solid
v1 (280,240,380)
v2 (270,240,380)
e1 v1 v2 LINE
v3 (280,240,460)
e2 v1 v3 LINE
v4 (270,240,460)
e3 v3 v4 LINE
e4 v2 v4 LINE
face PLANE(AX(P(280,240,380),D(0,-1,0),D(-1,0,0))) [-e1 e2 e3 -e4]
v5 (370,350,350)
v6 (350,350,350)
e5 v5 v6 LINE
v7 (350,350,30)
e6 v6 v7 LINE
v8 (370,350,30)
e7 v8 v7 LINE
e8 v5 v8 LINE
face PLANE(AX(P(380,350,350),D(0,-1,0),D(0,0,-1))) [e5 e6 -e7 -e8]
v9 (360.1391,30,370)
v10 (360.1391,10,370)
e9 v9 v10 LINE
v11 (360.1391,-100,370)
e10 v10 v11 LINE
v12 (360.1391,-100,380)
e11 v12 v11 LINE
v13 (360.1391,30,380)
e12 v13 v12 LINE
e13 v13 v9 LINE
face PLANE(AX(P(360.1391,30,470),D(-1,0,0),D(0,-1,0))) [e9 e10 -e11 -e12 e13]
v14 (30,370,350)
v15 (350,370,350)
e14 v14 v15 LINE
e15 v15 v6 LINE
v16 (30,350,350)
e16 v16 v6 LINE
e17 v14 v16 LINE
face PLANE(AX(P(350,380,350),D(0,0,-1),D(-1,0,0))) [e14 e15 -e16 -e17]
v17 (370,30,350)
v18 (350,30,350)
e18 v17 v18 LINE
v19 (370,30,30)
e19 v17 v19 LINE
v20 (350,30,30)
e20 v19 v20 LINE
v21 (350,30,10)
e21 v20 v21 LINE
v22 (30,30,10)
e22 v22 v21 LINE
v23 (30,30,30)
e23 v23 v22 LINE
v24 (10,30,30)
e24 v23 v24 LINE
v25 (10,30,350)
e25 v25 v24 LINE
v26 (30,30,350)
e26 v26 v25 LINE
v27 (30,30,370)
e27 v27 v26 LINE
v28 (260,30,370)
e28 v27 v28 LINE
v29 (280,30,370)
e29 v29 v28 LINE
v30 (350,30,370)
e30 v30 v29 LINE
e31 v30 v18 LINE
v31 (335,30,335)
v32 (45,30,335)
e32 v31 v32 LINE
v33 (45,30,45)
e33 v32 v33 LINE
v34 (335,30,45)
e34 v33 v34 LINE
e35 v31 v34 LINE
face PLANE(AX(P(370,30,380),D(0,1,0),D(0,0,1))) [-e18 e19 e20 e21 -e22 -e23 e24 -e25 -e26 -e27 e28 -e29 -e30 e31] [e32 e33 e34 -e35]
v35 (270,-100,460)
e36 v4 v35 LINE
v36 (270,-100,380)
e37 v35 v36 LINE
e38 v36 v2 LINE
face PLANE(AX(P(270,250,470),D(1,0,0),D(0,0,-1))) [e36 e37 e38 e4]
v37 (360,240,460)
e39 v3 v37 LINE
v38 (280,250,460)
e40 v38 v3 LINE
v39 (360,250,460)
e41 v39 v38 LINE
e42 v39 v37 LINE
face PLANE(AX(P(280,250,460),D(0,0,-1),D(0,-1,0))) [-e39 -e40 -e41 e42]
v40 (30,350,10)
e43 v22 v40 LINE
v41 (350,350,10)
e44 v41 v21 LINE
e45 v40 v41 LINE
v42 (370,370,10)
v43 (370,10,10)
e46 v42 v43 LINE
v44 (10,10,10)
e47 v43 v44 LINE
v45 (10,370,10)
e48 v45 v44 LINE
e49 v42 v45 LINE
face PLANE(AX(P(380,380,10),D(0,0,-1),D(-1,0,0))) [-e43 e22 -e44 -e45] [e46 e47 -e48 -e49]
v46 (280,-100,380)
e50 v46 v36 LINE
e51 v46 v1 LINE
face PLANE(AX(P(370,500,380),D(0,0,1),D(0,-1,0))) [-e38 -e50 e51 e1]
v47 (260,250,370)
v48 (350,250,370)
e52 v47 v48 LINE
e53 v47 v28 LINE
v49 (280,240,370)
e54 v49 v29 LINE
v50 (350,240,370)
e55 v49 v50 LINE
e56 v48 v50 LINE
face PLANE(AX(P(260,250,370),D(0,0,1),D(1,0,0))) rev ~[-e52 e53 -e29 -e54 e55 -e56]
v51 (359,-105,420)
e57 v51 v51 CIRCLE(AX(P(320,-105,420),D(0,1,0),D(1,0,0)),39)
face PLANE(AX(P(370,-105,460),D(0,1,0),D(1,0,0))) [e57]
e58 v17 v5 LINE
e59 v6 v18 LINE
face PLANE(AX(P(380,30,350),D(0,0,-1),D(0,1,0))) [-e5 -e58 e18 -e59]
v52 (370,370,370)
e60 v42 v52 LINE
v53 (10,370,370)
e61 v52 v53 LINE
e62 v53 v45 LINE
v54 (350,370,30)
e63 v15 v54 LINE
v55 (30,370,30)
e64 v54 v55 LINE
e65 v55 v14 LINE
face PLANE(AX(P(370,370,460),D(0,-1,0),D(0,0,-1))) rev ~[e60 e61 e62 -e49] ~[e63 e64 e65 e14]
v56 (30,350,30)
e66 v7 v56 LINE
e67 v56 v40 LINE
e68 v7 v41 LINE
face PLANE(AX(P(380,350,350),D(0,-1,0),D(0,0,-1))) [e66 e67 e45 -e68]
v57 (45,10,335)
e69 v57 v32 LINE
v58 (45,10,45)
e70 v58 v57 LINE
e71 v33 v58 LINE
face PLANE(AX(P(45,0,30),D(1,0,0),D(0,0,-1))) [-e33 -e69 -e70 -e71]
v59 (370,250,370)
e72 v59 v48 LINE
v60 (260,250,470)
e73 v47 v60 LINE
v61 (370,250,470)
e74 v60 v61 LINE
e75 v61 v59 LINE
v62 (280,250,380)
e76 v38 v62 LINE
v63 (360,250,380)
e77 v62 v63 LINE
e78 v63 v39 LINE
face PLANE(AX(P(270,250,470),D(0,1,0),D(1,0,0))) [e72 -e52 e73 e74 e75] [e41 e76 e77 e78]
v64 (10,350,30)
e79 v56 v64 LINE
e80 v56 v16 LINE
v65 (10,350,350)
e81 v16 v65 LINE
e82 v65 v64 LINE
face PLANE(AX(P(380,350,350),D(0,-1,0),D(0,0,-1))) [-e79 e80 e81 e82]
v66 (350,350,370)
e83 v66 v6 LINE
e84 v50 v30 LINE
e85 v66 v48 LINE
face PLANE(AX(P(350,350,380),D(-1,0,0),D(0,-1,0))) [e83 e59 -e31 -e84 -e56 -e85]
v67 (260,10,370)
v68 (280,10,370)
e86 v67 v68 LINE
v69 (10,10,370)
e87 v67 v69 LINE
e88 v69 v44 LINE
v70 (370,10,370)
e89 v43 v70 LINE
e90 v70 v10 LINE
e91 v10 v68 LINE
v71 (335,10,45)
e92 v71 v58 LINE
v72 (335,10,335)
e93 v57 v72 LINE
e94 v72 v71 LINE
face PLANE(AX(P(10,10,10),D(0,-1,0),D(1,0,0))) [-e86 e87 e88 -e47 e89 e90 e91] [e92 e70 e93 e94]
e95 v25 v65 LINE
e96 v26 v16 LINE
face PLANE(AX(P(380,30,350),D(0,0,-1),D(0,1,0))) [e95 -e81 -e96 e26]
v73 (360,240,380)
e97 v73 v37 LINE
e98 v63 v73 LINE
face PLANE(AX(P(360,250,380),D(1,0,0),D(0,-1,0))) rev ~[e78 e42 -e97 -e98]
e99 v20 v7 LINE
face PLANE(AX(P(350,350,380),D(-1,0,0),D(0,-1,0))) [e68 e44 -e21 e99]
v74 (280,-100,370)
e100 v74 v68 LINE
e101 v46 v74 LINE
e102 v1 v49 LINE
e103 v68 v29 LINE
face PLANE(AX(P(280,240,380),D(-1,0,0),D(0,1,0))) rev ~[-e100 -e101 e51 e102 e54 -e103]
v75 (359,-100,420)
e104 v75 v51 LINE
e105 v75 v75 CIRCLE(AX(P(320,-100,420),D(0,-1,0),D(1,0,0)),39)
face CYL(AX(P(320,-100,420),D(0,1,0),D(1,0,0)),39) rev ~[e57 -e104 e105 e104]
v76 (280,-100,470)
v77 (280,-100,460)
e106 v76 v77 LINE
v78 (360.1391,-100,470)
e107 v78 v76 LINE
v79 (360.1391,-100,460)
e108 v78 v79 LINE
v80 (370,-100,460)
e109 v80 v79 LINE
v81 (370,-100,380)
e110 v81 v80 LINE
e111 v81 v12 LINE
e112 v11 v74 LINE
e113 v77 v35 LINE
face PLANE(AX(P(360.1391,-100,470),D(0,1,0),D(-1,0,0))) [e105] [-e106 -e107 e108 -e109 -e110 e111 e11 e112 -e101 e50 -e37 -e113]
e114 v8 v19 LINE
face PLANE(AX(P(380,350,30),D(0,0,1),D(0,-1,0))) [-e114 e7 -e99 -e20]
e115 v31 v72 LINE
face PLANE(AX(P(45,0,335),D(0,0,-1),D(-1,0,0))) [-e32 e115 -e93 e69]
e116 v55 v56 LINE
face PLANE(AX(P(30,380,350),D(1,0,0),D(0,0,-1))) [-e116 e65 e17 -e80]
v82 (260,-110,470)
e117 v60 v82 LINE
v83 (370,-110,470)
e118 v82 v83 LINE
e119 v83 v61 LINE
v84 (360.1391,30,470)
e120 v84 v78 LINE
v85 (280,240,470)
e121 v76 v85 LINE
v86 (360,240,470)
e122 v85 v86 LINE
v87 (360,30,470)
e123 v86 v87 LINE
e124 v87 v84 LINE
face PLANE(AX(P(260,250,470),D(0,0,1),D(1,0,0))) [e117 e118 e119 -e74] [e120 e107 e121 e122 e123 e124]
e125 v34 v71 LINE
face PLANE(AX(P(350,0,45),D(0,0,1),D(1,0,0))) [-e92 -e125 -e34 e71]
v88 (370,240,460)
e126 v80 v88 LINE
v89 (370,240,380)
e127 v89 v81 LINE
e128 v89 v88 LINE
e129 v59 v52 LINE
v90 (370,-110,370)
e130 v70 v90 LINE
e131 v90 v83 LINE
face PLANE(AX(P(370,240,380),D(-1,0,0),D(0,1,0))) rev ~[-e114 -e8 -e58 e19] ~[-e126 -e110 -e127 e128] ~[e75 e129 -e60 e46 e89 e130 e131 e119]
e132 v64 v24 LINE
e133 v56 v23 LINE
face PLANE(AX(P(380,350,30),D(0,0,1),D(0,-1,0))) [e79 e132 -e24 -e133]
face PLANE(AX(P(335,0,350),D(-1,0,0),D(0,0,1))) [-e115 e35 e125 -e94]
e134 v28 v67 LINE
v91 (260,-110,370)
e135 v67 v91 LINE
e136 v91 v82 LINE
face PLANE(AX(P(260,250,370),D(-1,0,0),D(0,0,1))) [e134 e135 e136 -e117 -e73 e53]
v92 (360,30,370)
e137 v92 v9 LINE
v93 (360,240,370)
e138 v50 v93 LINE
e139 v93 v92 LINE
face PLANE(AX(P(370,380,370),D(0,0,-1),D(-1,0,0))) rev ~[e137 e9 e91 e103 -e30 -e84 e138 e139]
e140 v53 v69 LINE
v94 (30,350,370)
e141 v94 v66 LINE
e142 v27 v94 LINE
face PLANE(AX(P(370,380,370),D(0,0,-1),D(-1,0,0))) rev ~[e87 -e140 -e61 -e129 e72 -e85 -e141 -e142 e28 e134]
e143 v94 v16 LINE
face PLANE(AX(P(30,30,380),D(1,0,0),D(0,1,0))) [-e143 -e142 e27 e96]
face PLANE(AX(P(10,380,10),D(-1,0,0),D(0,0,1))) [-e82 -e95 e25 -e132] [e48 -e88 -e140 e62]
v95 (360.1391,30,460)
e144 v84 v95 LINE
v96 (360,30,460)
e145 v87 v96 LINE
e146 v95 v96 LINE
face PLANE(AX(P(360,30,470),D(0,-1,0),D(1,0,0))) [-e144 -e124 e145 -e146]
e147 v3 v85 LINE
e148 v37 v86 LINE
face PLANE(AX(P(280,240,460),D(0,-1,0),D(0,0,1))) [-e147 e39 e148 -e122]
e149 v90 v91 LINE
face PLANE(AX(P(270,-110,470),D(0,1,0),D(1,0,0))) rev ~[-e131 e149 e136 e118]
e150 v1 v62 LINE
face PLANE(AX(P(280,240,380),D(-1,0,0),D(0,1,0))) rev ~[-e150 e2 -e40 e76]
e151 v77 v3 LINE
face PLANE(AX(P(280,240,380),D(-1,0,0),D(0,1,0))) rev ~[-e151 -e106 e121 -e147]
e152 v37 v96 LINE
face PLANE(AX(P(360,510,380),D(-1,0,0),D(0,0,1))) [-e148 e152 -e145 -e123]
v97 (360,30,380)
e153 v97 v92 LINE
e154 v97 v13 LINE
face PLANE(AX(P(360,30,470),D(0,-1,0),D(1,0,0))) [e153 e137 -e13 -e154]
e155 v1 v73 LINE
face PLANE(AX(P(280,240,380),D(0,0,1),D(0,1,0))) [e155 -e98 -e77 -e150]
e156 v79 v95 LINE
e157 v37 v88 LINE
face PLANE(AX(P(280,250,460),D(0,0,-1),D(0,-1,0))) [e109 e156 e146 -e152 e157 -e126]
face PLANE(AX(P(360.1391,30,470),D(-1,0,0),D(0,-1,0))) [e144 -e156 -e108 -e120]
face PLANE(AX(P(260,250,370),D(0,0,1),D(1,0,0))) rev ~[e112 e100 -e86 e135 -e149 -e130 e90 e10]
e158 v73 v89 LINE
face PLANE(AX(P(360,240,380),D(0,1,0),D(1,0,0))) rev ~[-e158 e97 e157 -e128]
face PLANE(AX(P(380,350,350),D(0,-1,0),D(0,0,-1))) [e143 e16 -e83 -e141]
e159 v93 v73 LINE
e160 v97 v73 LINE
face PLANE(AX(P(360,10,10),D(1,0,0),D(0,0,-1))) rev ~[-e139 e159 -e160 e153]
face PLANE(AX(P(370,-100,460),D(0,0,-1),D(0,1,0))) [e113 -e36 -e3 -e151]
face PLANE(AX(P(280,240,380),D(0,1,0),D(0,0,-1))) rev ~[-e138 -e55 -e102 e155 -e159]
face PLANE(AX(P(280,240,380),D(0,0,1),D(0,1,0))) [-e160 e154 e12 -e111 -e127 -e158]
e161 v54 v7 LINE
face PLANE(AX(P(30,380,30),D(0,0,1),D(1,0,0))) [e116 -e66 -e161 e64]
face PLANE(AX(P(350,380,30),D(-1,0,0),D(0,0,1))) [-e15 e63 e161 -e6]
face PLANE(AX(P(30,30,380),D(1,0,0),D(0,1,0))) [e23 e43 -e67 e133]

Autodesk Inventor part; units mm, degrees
ref_plane "YZ Plane" through (0, 0, 0) normal (1, 0, 0) x (0, 1, 0)
ref_plane "XZ Plane" through (0, 0, 0) normal (0, 1, 0) x (-1, 0, 0)
ref_plane "XY Plane" through (0, 0, 0) normal (0, 0, 1) x (1, 0, 0)
sketch "Sketch1" plane through (0, 0, 0) normal (0, 0, 1) x (1, 0, 0)
  line L0 (0, 0) -> (380, 0)
  line L1 (380, 0) -> (380, 380)
  line L2 (380, 380) -> (0, 380)
  line L3 (0, 380) -> (0, 0)
  dimension "d0" = 380
  dimension "d1" = 380
extrude "Extrusion1" add sketch "Sketch1" along normal blind 380
sketch "Sketch2" plane through (0, 0, 380) normal (0, 0, 1) x (1, 0, 0)
  line L0 (30, 350) -> (350, 350)
  line L1 (350, 350) -> (350, 30)
  line L2 (350, 30) -> (30, 30)
  line L3 (30, 30) -> (30, 350)
  line L4 (380, 380) -> (0, 380) projected
  line L5 (0, 380) -> (0, 0) projected
  line L6 (0, 0) -> (380, 0) projected
  line L7 (380, 0) -> (380, 380) projected
  dimension "d4" = 30
  dimension "d5" = 30
  dimension "d6" = 30
  dimension "d7" = 30
extrude "Extrusion2" cut sketch "Sketch2" against normal blind 600 contours L0 L1 L2 L3
sketch "Sketch3" plane through (380, 0, 0) normal (1, 0, 0) x (0, 0, -1)
  line L0 (-350, 350) -> (-30, 350)
  line L1 (-30, 350) -> (-30, 30)
  line L2 (-30, 30) -> (-350, 30)
  line L3 (-350, 30) -> (-350, 350)
  line L4 (0, 380) -> (-380, 380) projected
  line L5 (-380, 0) -> (-380, 380) projected
  line L6 (0, 0) -> (0, 380) projected
  line L7 (0, 0) -> (-380, 0) projected
  dimension "d10" = 30
  dimension "d11" = 30
  dimension "d12" = 30
  dimension "d13" = 30
extrude "Extrusion3" cut sketch "Sketch3" against normal blind 600 contours L0 L1 L2 L3
sketch "Sketch4" plane through (0, 380, 0) normal (0, 1, 0) x (1, 0, 0)
  line L0 (30, -30) -> (30, 0) projected
  line L1 (350, -380) -> (350, -350) projected
  line L2 (30, -30) -> (350, -30)
  line L3 (350, -30) -> (350, -350)
  line L4 (350, -350) -> (30, -350)
  line L5 (30, -350) -> (30, -30)
  point P0 (0, 0)
extrude "Extrusion4" cut sketch "Sketch4" against normal blind 600
sketch "Sketch5" plane through (30, 0, 30) normal (1, 0, 0) x (0, 0, -1)
  line L0 (-350, 30) -> (-320, 30) projected
  line L1 (0, 30) -> (0, 0) projected
  line L2 (-320, 30) -> (0, 30)
  line L3 (0, 30) -> (0, 0)
  line L4 (0, 0) -> (-320, 0)
  line L5 (-320, 0) -> (-320, 30)
  point P0 (30, 0)
extrude "Extrusion5" add sketch "Sketch5" along normal blind 15
sketch "Sketch6" plane through (350, 0, 30) normal (0, 0, 1) x (1, 0, 0)
  line L0 (-320, 30) -> (-350, 30) projected
  line L1 (0, 30) -> (0, 0) projected
  line L2 (-320, 30) -> (0, 30)
  line L3 (0, 30) -> (0, 0)
  line L4 (0, 0) -> (-320, 0)
  line L5 (-320, 0) -> (-320, 30)
  point P0 (-350, 0)
extrude "Extrusion6" add sketch "Sketch6" along normal blind 15
sketch "Sketch7" plane through (350, 0, 350) normal (-1, 0, 0) x (0, 0, 1)
  line L0 (0, 30) -> (-320, 30) projected
  line L1 (0, 0) -> (-305, 0) projected
  line L2 (-320, 30) -> (0, 30)
  line L3 (0, 30) -> (0, 0)
  line L4 (0, 0) -> (-320, 0)
  line L5 (-320, 0) -> (-320, 30)
  point P0 (-350, 0)
extrude "Extrusion7" add sketch "Sketch7" along normal blind 15
sketch "Sketch8" plane through (45, 0, 350) normal (0, 0, -1) x (-1, 0, 0)
  line L0 (45, 0) -> (-335, 0) projected
  line L1 (-305, 30) -> (15, 30)
  line L2 (15, 30) -> (15, 0)
  line L3 (15, 0) -> (-305, 0)
  line L4 (-305, 0) -> (-305, 30)
  dimension "d24" = 320
extrude "Extrusion8" add sketch "Sketch8" along normal blind 15
sketch "Sketch9" plane through (0, 380, 0) normal (0, 1, 0) x (1, 0, 0)
  line L0 (0, -380) -> (380, -380) projected
  line L1 (0, 0) -> (20, 0)
  line L2 (10, -380) -> (0, -380)
  line L3 (0, -380) -> (0, 0)
  line L4 (20, 0) -> (380, 0)
  line L5 (380, 0) -> (380, -10)
  line L6 (380, -10) -> (10, -10)
  line L7 (10, -10) -> (10, -380)
  line L8 (0, -30) -> (0, -350) projected
  dimension "d27" = 10
  dimension "d28" = 10
extrude "Extrusion9" cut sketch "Sketch9" against normal blind 900
sketch "Sketch10" plane through (10, 380, 10) normal (0, 1, 0) x (1, 0, 0)
  line L0 (370, 0) -> (360, 0)
  line L1 (360, 0) -> (360, -370)
  line L2 (360, -370) -> (370, -370)
  line L3 (370, -370) -> (370, 0)
  line L4 (0, -370) -> (360, -370)
  line L5 (360, -370) -> (360, -360)
  line L6 (360, -360) -> (0, -360)
  line L7 (0, -360) -> (0, -370)
  point P0 (-10, 10)
  dimension "d31" = 10
  dimension "d32" = 10
extrude "Extrusion10" cut sketch "Sketch10" against normal blind 900
sketch "Sketch11" plane through (370, 380, 370) normal (1, 0, 0) x (0, 0, -1)
  line L0 (0, 0) -> (360, 0) projected
  line L1 (0, 0) -> (360, 0)
  line L2 (360, 0) -> (360, -10)
  line L3 (360, -10) -> (0, -10)
  line L4 (0, -10) -> (0, 0)
  line L5 (360, 0) -> (360, -380) projected
  line L6 (0, -380) -> (360, -380)
  line L7 (360, -380) -> (360, -370)
  line L8 (360, -370) -> (0, -370)
  line L9 (0, -370) -> (0, -380)
  point P0 (370, -380)
  dimension "d35" = 10
  dimension "d36" = 10
extrude "Extrusion11" cut sketch "Sketch11" against normal blind 900
sketch "Sketch13" plane through (10, 10, 370) normal (0, 0, 1) x (1, 0, 0)
  line L0 (0, 0) -> (360, 0) projected
  line L1 (360, 0) -> (260, 0)
  line L2 (260, 0) -> (260, 500)
  line L3 (260, 500) -> (360, 500)
  line L4 (360, 500) -> (360, 0)
  point P0 (-10, -10)
  point P1 (260, 0)
  dimension "d41" = 100
  dimension "d42" = 500
extrude "Extrusion13" add sketch "Sketch13" along normal blind 100
sketch "Sketch14" plane through (270, 510, 370) normal (0, 1, 0) x (1, 0, 0)
  line L0 (10, -10) -> (90, -10)
  line L1 (90, -10) -> (90, -90)
  line L2 (90, -90) -> (10, -90)
  line L3 (10, -90) -> (10, -10)
  line L4 (100, 0) -> (0, 0) projected
  line L5 (0, 0) -> (0, -100) projected
  line L6 (100, -100) -> (0, -100) projected
  line L7 (100, 0) -> (100, -100) projected
  point P0 (-270, 370)
  dimension "d45" = 10
  dimension "d46" = 10
  dimension "d47" = 10
  dimension "d48" = 10
extrude "Extrusion14" cut sketch "Sketch14" against normal blind 900 contours L0 L1 L2 L3
sketch "Sketch15" plane through (10, 10, 470) normal (0, 0, 1) x (1, 0, 0)
  line L0 (270, 500) -> (270, 0) projected
  line L1 (360, 20) -> (340, 20) projected
  line L2 (270, 490) -> (350, 490)
  line L3 (350, 490) -> (350, 20)
  line L4 (350, 20) -> (270, 20)
  line L5 (270, 20) -> (270, 490)
  line L6 (360, 500) -> (260, 500) projected
  point P0 (-10, -10)
  point P1 (270, 20)
  dimension "d51" = 10
extrude "Extrusion15" cut sketch "Sketch15" against normal blind 100
sketch "Sketch16" plane through (370, 10, 10) normal (1, 0, 0) x (0, 0, -1)
  line L0 (-450, 490) -> (-370, 490)
  line L1 (-370, 490) -> (-370, 20)
  line L2 (-370, 20) -> (-450, 20)
  line L3 (-450, 20) -> (-450, 490)
  line L4 (-360, 500) -> (-460, 500) projected
  line L5 (-460, 0) -> (-460, 500) projected
  line L6 (-360, 360) -> (-360, 500) projected
  line L7 (0, 0) -> (-460, 0) projected
  point P0 (10, -10)
  dimension "d54" = 10
  dimension "d55" = 10
  dimension "d56" = 10
  dimension "d57" = 20
extrude "Extrusion16" cut sketch "Sketch16" against normal blind 100
sketch "Sketch17" plane through (10, 10, 10) normal (0, -1, 0) x (1, 0, 0)
  line L0 (270, 450) -> (350, 450) projected
  line L1 (270, 370) -> (350, 370) projected
  line L2 (270, 450) -> (350, 450)
  line L3 (350, 450) -> (350, 370)
  line L4 (350, 370) -> (270, 370)
  line L5 (270, 370) -> (270, 450)
  point P0 (-10, -10)
  point P1 (350, 450)
extrude "Extrusion17" add sketch "Sketch17" against normal blind 20
sketch "Sketch19" plane through (370, 10, 10) normal (1, 0, 0) x (0, 0, -1)
  line L0 (-360, 500) -> (-460, 500) projected
  line L1 (-360, 490) -> (-360, 360) projected
  line L2 (-460, 500) -> (-360, 500)
  line L3 (-360, 500) -> (-360, 420)
  line L4 (-360, 420) -> (-460, 420)
  line L5 (-460, 420) -> (-460, 500)
  point P0 (10, -10)
  dimension "d65" = 80
extrude "Extrusion19" cut sketch "Sketch19" against normal blind 8900
sketch "Sketch20" plane through (370, 10, 10) normal (1, 0, 0) x (0, 0, -1)
  line L0 (-460, 420) -> (-450, 420) projected
  line L1 (-360, 360) -> (-360, 20) projected
  line L2 (-460, 420) -> (-360, 420)
  line L3 (-360, 420) -> (-360, 360)
  line L4 (-360, 360) -> (-460, 360)
  line L5 (-460, 360) -> (-460, 420)
  point P0 (10, -10)
extrude "Extrusion20" cut sketch "Sketch20" against normal blind 8900
sketch "Sketch21" plane through (270, 370, 380) normal (0, 0, 1) x (1, 0, 0)
  line L0 (10, -20) -> (10, 0) projected
  line L1 (0, 0) -> (10, 0)
  line L2 (10, 0) -> (10, -20)
  line L3 (10, -20) -> (0, -20)
  line L4 (0, -20) -> (0, 0)
  point P0 (-270, -370)
extrude "Extrusion21" add sketch "Sketch21" along normal up to surface (80 mm away)
sketch "Sketch22" plane through (280, 30, 470) normal (1, 0, 0) x (0, 0, -1)
  line L0 (0, 340) -> (10, 340)
  line L1 (10, 340) -> (10, 320)
  line L2 (10, 320) -> (0, 320)
  line L3 (0, 320) -> (0, 340)
  point P0 (470, -30)
  dimension "d72" = 20
extrude "Extrusion22" add sketch "Sketch22" along normal up to surface (80 mm away)
sketch "Sketch23" plane through (370, 10, 10) normal (1, 0, 0) x (0, 0, -1)
  line L0 (-370, 20) -> (-370, 360) projected
  line L1 (-450, 360) -> (-370, 360)
  line L2 (-370, 360) -> (-370, 340)
  line L3 (-370, 340) -> (-450, 340)
  line L4 (-450, 340) -> (-450, 360)
  point P0 (10, -10)
  dimension "d75" = 20
extrude "Extrusion23" add sketch "Sketch23" against normal blind 10
sketch "Sketch26" plane through (10, 10, 10) normal (0, -1, 0) x (1, 0, 0)
  line L0 (260, 460) -> (360, 460) projected
  line L1 (360, 0) -> (360, 460) projected
  line L2 (260, 460) -> (360, 460)
  line L3 (360, 460) -> (360, 360)
  line L4 (360, 360) -> (260, 360)
  line L5 (260, 360) -> (260, 460)
  point P0 (-10, -10)
  dimension "d86" = 100
extrude "Extrusion26" add sketch "Sketch26" along normal blind 120
sketch "Sketch30" plane through (10, 10, 470) normal (0, 0, 1) x (1, 0, 0)
  line L0 (360, 360) -> (260, 360) projected
  line L1 (260, 340) -> (260, 20) projected
  line L2 (360, 360) -> (260, 360)
  line L3 (260, 360) -> (260, 240)
  line L4 (260, 240) -> (360, 240)
  line L5 (360, 240) -> (360, 360)
  point P0 (-10, -10)
  dimension "d96" = 120
extrude "Extrusion30" cut sketch "Sketch30" against normal up to surface (100 mm away)
sketch "Sketch31" plane through (370, 10, 10) normal (1, 0, 0) x (0, 0, -1)
  line L0 (-450, 240) -> (-450, 20) projected
  line L1 (-450, 20) -> (-370, 20)
  line L2 (-370, 20) -> (-370, -110)
  line L3 (-370, -110) -> (-450, -110)
  line L4 (-450, -110) -> (-450, 20)
  line L5 (-360, -120) -> (-460, -120) projected
  point P0 (10, -10)
  dimension "d99" = 10
extrude "Extrusion31" cut sketch "Sketch31" against normal blind 200
sketch "Sketch32" plane through (10, 10, 470) normal (0, 0, 1) x (1, 0, 0)
  line L0 (350, 20) -> (270, 20) projected
  line L1 (270, 20) -> (350.1391, 20)
  line L2 (350.1391, 20) -> (350.1391, -110)
  line L3 (350.1391, -110) -> (270, -110)
  line L4 (270, -110) -> (270, 20)
  line L5 (360, -120) -> (260, -120) projected
  point P0 (-10, -10)
  point P1 (350, 20)
  dimension "d102" = 10
extrude "Extrusion32" cut sketch "Sketch32" against normal blind 100
sketch "Sketch33" plane through (270, 250, 380) normal (0, 0, 1) x (1, 0, 0)
  line L0 (0, 0) -> (10, 0) projected
  line L1 (10, -350) -> (10, 0) projected
  line L2 (0, 0) -> (10, 0)
  line L3 (10, 0) -> (10, -10)
  line L4 (10, -10) -> (0, -10)
  line L5 (0, -10) -> (0, 0)
  point P0 (-270, -250)
  dimension "d105" = 10
extrude "Extrusion33" add sketch "Sketch33" along normal up to surface (80 mm away)
sketch "Sketch34" plane through (280, 10, 370) normal (1, 0, 0) x (0, 0, -1)
  line L0 (-90, 240) -> (-90, 20) projected
  line L1 (-100, 240) -> (-90, 240)
  line L2 (-90, 240) -> (-90, 230)
  line L3 (-90, 230) -> (-100, 230)
  line L4 (-100, 230) -> (-100, 240)
  line L5 (0, 240) -> (-100, 240) projected
  line L6 (-10, 20) -> (-10, 240) projected
  line L7 (0, 240) -> (-10, 240)
  line L8 (-10, 240) -> (-10, 230)
  line L9 (-10, 230) -> (0, 230)
  line L10 (0, 230) -> (0, 240)
  point P0 (370, -10)
  point P1 (-90, 240)
  dimension "d108" = 10
extrude "Extrusion34" add sketch "Sketch34" along normal up to surface (90 mm away)
sketch "Sketch35" plane through (280, 250, 380) normal (0, 0, 1) x (1, 0, 0)
  line L0 (0, 0) -> (90, 0) projected
  line L1 (80, -10) -> (80, -220) projected
  line L2 (90, 0) -> (80, 0)
  line L3 (80, 0) -> (80, -10)
  line L4 (80, -10) -> (90, -10)
  line L5 (90, -10) -> (90, 0)
  point P0 (-280, -250)
extrude "Extrusion35" add sketch "Sketch35" along normal up to surface (80 mm away)
sketch "Sketch36" plane through (370, -100, 460) normal (0, 1, 0) x (1, 0, 0)
  line L0 (-340, 90) -> (-100, 90) projected
  line L1 (0, -10) -> (-100, -10) projected
  line L2 (-100, 90) -> (0, -10)
  circle A0 centre (-50, 40) radius 39
  point P0 (-370, 460)
  dimension "d113" = 78
extrude "Extrusion36" cut sketch "Sketch36" against normal blind 5
sketch "Sketch41" plane through (30, 350, 370) normal (0, 0, 1) x (1, 0, 0)
  point P0 (-30, -350)
sketch "Sketch42" plane through (270, 250, 470) normal (0, 1, 0) x (1, 0, 0)
  line L0 (-240, 100) -> (0, 100) projected
  line L1 (0, 100) -> (-10, 100)
  line L2 (-10, 100) -> (-10, 0)
  line L3 (-10, 0) -> (0, 0)
  line L4 (0, 0) -> (0, 100)
  point P0 (-270, 470)
  dimension "d119" = 10
extrude "Extrusion37" add sketch "Sketch42" against normal up to surface (360 mm away)
properties part number "Motor housing 2"
